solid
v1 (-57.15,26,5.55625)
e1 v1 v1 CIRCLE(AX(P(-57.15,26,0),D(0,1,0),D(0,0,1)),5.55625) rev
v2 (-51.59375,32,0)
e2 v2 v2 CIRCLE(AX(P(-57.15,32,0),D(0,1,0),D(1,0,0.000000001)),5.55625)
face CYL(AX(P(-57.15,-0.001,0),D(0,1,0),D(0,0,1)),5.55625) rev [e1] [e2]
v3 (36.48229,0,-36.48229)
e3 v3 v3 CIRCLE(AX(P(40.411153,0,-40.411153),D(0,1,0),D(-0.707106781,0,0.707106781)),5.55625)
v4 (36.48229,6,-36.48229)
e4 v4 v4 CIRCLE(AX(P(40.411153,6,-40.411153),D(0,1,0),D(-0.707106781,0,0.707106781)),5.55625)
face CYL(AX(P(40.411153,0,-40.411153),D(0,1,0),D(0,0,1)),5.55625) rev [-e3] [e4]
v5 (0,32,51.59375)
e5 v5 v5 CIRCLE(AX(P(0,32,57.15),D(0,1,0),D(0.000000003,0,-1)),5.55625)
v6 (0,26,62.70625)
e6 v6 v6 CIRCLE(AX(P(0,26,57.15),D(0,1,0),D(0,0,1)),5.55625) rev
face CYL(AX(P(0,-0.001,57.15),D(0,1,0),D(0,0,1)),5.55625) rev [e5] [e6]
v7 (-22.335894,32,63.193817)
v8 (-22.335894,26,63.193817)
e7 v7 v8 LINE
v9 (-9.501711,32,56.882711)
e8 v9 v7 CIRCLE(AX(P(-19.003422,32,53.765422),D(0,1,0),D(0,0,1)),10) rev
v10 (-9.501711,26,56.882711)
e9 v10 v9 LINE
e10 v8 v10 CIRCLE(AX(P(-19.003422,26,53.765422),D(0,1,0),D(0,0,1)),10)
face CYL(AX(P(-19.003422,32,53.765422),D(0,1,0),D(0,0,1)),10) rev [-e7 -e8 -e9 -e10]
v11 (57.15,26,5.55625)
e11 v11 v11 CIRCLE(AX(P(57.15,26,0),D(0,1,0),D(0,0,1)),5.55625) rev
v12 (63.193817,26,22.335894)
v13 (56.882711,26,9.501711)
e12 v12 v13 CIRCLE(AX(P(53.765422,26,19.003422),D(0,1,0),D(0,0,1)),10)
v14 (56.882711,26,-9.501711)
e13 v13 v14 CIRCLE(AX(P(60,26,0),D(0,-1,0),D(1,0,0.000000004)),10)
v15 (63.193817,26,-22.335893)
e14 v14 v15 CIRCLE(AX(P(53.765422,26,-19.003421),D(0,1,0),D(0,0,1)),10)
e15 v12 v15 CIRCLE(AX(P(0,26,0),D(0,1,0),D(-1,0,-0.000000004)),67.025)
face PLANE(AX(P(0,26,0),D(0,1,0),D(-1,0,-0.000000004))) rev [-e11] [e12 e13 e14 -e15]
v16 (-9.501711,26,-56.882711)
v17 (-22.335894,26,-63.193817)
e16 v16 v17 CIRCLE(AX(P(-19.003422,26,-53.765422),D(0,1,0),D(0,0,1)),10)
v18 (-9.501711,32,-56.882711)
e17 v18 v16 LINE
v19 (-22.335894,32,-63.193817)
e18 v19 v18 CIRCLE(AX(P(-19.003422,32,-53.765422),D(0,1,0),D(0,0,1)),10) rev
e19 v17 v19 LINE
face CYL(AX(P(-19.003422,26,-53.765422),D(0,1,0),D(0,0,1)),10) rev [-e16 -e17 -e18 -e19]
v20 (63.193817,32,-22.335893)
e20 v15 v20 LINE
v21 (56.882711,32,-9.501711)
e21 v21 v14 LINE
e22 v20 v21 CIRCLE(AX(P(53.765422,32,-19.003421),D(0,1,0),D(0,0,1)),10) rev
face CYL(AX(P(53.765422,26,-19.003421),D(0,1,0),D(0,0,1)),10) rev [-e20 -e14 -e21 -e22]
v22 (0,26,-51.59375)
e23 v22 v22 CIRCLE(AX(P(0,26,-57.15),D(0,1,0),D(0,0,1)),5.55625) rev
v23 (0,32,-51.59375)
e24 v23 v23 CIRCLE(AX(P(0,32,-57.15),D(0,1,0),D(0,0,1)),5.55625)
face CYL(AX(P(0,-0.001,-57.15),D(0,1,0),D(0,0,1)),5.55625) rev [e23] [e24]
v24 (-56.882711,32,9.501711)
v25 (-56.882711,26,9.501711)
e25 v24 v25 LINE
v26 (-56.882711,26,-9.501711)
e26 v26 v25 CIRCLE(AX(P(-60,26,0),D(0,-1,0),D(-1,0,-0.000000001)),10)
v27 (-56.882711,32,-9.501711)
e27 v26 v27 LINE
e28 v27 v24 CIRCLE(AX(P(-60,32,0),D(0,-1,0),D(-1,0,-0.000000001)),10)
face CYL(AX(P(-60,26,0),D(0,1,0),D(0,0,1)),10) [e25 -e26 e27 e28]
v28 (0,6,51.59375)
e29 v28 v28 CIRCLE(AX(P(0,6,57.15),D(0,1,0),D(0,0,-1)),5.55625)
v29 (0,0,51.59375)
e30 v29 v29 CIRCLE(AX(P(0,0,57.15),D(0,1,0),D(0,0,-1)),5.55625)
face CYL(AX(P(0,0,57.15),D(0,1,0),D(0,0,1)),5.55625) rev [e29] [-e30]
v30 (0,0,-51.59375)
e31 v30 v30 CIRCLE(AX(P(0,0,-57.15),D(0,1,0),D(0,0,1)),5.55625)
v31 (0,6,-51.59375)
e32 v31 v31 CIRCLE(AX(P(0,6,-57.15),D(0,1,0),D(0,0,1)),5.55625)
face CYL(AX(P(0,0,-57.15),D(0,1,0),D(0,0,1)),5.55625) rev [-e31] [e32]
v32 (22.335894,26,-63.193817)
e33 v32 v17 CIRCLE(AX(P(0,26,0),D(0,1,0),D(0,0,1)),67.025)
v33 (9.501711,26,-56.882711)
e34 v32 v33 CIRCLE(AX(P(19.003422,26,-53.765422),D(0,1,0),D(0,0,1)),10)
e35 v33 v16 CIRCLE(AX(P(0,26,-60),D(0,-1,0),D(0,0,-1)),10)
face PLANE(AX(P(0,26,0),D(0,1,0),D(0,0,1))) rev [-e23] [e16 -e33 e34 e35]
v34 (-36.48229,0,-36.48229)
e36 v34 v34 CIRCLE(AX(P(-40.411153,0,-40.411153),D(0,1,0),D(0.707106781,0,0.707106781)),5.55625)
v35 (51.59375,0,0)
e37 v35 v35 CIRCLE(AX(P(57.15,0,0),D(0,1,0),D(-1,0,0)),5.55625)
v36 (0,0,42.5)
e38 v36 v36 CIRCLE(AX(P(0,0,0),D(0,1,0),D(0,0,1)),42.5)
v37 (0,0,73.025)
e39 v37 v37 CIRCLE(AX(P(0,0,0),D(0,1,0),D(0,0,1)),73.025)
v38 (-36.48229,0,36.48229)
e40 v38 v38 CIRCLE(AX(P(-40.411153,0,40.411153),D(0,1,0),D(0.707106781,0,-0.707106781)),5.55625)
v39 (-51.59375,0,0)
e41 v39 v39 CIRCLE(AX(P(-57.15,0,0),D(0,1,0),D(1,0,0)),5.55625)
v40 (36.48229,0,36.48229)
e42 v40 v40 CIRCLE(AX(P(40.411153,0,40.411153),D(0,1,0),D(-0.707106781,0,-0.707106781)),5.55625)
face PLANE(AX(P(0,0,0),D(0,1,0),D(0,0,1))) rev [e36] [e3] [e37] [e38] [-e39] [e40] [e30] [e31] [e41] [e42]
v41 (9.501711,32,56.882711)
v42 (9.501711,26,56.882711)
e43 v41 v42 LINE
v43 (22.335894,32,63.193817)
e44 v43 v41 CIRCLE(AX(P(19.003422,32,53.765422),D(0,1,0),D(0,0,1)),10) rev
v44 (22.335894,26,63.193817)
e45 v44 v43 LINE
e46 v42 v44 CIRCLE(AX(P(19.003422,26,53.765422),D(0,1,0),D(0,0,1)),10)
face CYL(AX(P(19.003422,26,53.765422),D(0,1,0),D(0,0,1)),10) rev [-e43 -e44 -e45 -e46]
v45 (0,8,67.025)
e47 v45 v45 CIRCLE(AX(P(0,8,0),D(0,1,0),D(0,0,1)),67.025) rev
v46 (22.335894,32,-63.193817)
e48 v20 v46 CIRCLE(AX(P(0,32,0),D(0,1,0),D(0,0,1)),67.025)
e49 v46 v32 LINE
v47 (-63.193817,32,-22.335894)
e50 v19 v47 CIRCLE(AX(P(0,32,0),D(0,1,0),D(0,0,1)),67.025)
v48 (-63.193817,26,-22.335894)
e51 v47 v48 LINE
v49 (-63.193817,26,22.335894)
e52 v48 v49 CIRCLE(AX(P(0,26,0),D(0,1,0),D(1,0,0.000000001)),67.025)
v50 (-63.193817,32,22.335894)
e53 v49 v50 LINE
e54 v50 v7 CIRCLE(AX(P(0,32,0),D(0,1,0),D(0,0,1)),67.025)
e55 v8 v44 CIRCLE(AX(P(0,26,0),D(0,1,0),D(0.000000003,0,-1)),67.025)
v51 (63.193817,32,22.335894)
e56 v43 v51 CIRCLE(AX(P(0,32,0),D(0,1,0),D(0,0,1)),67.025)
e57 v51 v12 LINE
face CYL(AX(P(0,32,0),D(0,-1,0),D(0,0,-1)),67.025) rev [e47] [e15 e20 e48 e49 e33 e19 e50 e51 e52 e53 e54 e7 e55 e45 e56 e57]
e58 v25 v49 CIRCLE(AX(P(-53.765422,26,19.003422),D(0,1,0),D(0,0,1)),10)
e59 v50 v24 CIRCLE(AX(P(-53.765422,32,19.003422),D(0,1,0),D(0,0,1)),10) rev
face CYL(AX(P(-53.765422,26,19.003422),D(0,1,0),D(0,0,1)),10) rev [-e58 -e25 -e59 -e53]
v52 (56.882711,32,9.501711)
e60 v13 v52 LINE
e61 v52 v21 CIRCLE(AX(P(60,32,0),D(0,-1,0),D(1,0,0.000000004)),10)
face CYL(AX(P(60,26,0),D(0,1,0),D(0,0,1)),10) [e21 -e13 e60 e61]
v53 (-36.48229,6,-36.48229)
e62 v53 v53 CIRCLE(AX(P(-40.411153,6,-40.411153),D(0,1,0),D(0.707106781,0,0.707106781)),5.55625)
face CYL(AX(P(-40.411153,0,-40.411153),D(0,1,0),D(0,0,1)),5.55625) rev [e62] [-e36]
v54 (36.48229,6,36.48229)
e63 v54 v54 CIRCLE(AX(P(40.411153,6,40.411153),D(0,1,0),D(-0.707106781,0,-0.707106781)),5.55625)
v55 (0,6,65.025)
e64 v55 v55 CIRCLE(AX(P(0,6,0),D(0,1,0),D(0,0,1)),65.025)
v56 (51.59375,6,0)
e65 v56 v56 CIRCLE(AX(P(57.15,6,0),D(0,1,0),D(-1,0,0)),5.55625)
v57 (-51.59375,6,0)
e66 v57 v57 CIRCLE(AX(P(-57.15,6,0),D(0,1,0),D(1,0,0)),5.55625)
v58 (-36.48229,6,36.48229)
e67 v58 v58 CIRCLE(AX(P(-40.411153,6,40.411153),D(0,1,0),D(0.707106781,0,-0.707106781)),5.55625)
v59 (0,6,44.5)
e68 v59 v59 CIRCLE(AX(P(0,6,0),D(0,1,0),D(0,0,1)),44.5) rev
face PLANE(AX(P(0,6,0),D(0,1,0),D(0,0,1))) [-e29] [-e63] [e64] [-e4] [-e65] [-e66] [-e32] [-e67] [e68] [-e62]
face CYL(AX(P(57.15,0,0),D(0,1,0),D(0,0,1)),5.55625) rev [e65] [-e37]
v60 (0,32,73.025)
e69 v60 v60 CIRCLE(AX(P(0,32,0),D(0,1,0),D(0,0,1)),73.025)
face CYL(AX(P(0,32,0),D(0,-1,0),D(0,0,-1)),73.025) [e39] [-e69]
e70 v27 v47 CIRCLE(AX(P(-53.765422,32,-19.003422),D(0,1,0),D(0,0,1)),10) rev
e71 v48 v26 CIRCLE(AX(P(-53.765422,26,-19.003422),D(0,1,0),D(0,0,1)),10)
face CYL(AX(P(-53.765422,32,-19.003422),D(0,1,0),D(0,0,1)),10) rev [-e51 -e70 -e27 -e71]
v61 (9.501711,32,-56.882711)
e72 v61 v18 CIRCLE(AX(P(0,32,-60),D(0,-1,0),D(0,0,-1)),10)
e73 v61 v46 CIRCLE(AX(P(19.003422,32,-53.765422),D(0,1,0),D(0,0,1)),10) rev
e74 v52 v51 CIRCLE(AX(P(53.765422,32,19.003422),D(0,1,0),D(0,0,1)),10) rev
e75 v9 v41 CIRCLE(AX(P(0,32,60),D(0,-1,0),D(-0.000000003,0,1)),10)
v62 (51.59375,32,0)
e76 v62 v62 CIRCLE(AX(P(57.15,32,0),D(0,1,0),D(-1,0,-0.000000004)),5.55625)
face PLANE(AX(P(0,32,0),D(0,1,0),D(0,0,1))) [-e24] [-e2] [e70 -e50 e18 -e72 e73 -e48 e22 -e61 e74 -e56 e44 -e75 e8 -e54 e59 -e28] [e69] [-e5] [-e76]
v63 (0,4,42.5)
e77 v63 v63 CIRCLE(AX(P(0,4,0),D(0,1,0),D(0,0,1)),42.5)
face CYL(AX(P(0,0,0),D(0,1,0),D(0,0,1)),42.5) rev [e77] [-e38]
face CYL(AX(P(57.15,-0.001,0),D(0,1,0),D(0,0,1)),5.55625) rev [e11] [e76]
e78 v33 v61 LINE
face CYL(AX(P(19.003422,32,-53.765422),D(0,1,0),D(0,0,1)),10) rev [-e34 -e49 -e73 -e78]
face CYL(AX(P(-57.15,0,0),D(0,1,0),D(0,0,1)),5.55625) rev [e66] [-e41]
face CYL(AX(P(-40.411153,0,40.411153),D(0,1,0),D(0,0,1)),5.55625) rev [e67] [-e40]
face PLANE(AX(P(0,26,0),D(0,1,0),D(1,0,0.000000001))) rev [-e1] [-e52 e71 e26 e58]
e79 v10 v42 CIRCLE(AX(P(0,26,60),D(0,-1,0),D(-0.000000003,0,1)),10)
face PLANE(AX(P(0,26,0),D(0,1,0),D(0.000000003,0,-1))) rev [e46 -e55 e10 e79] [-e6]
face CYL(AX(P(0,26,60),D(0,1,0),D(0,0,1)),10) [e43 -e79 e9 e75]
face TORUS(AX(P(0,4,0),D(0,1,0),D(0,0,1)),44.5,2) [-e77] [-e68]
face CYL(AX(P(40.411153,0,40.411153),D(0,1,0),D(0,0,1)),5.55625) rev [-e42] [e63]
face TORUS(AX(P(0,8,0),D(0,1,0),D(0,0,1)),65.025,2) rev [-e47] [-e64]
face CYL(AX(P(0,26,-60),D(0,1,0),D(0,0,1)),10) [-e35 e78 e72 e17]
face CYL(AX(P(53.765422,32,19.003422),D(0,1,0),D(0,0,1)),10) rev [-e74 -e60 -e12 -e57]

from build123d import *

# Parameters (mm, degrees)
SKETCH1_R             = 73.02499999999999
BASE_EXTRUDE_DEPTH    = 32
SHELL1_T              = -6
SKETCH4_R             = 42.5
CUT_EXTRUDE2_DEPTH    = 107.49554568149786
BOSS_EXTRUDE1_START   = -6
BOSS_EXTRUDE1_DEPTH   = 6
CUT_EXTRUDE1_REACH    = 110.117
SKETCH3_R             = 5.556250000000003
FILLET1_R             = 10
CIRPATTERN1_START     = 26
CIRPATTERN1_OUTLINE_R = 5.55625
CIRPATTERN1_DEPTH     = 6
SKETCH5_R             = 5.5562499999999995
CUT_EXTRUDE3_DEPTH    = 107.49554568149786
CIRPATTERN2_COUNT     = 8
FILLET2_R             = 2


# Read off the part's stored shape, not the designer's step: CirPattern1
with BuildPart() as part:
    # Sketch1 → Base-Extrude (new body)
    with BuildSketch(Plane(origin=(0, 0, 0), x_dir=(1, 0, 0), z_dir=(0, 1, 0))):
        with Locations(Location((0, 0, 0), (0, 0, 270))):
            Circle(SKETCH1_R)
    extrude(amount=BASE_EXTRUDE_DEPTH)

    # Shell1
    shell1_openings = [part.faces().sort_by_distance(p)[0] for p in [
        (0, 32, 0),
    ]]
    offset(amount=SHELL1_T, openings=shell1_openings, kind=Kind.INTERSECTION)

    # Sketch4 → Cut-Extrude2 (cut, through all)
    with BuildSketch(Plane(origin=(0, 6, 0), x_dir=(-1, 0, 0), z_dir=(0, 1, 0))):
        with Locations(Location((0, 0, 0), (0, 0, 90))):
            Circle(SKETCH4_R)
    extrude(amount=-CUT_EXTRUDE2_DEPTH, mode=Mode.SUBTRACT)

    # Sketch2 → Boss-Extrude1 (add)
    with BuildSketch(Plane(origin=(0, 32, 0), x_dir=(-1, 0, 0), z_dir=(0, 1, 0)).offset(BOSS_EXTRUDE1_START)):
        with BuildLine():
            Line((-10, -66.2748113916592), (-10.000000000000002, -60))
            ThreePointArc((-10.000000000000002, -60), (6.1e-16, -50), (10.000000000000002, -60))
            Line((10.000000000000002, -60), (10, -66.2748113916592))
            ThreePointArc((10, -66.2748113916592), (4.1e-15, -67.025), (-10, -66.2748113916592))
        make_face()
    extrude(amount=BOSS_EXTRUDE1_DEPTH)

    # Sketch3 → Cut-Extrude1 (cut, up to next)
    with BuildSketch(Plane(origin=(0, 32, 0), x_dir=(-1, 0, 0), z_dir=(0, 1, 0)), mode=Mode.PRIVATE) as cut_extrude1_sk1:
        with Locations(Location((0, -57.15, 0), (0, 0, 90))):
            Circle(SKETCH3_R)
    cut_extrude1_tool1 = extrude(cut_extrude1_sk1.sketch, amount=-CUT_EXTRUDE1_REACH, mode=Mode.PRIVATE) & part.part
    add(cut_extrude1_tool1.solids().sort_by_distance((0, 32, -57.15))[0], mode=Mode.SUBTRACT)

    # Fillet1
    # the kernel refuses this fillet: 10 mm, written as the material it adds along each edge
    with BuildSketch(Plane(origin=(-10, 26, -66.2748113916592), x_dir=(-0.9701975992625391, 0, 0.24231512207290193), z_dir=(0, 1, 0))) as fillet1_piece_1:
        with BuildLine():
            CenterArc((11.76631234828467, 9.95491445348666), FILLET1_R, 184.14023221581692, 91.30253304935542)
            Line((1.7924090220068125, 9.232936311114328), (0.7950186893790265, 9.160738496877093))
            ThreePointArc((0.7950186893790265, 9.160738496877093), (0.5502840890917953, 6.3301220700858885), (-0.9701975992625391, 0.24231512207290193))
            Line((-0.9701975992625391, 0.24231512207290193), (-0.09485136919214045, -0.9954914453486712))
            ThreePointArc((-0.09485136919214045, -0.9954914453486712), (6.357413020103008, -1.3021858755056244), (12.809677409398176, -0.9954914453486696))
            Line((12.809677409398176, -0.9954914453486696), (12.714826040206038, 1.7e-16))
        make_face()
    extrude(amount=6)
    with BuildSketch(Plane(origin=(10, 26, -66.2748113916592), x_dir=(0.970197599262539, 0, 0.24231512207290234), z_dir=(0, 1, 0))) as fillet1_piece_2:
        with BuildLine():
            CenterArc((11.766312348284657, -9.95491445348666), FILLET1_R, 84.55723473482769, 91.30253304935547)
            Line((1.792409022006801, -9.232936311114338), (0.7950186893790149, -9.160738496877103))
            ThreePointArc((0.7950186893790149, -9.160738496877103), (0.550284089091798, -6.3301220700858885), (-0.970197599262539, -0.24231512207290234))
            Line((-0.970197599262539, -0.24231512207290234), (-0.09485136919213914, 0.9954914453486715))
            ThreePointArc((-0.09485136919213914, 0.9954914453486715), (6.357413020103015, 1.3021858755056288), (12.809677409398152, 0.995491445348669))
            Line((12.809677409398152, 0.995491445348669), (12.714826040206018, 1.7e-16))
        make_face()
    extrude(amount=6)
    # the kernel refuses this fillet: 10 mm, written as the material it takes off along each edge

    # CirPattern1 outline → CirPattern1 (add)
    # profile 1 of 3: a face of its own
    with BuildSketch(Plane(origin=(0, 0, 0), x_dir=(1, 0, 0), z_dir=(0, 1, 0)).offset(CIRPATTERN1_START)):
        with BuildLine():
            ThreePointArc((-63.193816801, -22.335893605), (-62.73913957, -14.590668353), (-56.882710952, -9.501710756))
            ThreePointArc((-56.882710952, -9.501710756), (-50, 7.4e-08), (-56.882710923, 9.501710926))
            ThreePointArc((-56.882710923, 9.501710926), (-62.739139527, 14.59066854), (-63.193816734, 22.335893794))
            ThreePointArc((-63.193816734, 22.335893794), (-67.025, 1e-07), (-63.193816801, -22.335893605))
        make_face()
        with Locations((-57.15, 8.5e-08)):
            Circle(CIRPATTERN1_OUTLINE_R, mode=Mode.SUBTRACT)
    # profile 2 of 3: a face of its own
    with BuildSketch(Plane(origin=(0, 0, 0), x_dir=(1, 0, 0), z_dir=(0, 1, 0)).offset(CIRPATTERN1_START)):
        with BuildLine():
            ThreePointArc((-9.501711011, -56.882710909), (-14.590668634, -62.739139505), (-22.335893888, -63.193816701))
            ThreePointArc((-22.335893888, -63.193816701), (-2e-07, -67.025), (22.33589351, -63.193816834))
            ThreePointArc((22.33589351, -63.193816834), (14.590668259, -62.739139592), (9.501710671, -56.882710966))
            ThreePointArc((9.501710671, -56.882710966), (-1.49e-07, -50), (-9.501711011, -56.882710909))
        make_face()
        with Locations((-1.71e-07, -57.15)):
            Circle(CIRPATTERN1_OUTLINE_R, mode=Mode.SUBTRACT)
    # profile 3 of 3: a face of its own
    with BuildSketch(Plane(origin=(0, 0, 0), x_dir=(1, 0, 0), z_dir=(0, 1, 0)).offset(CIRPATTERN1_START)):
        with BuildLine():
            ThreePointArc((63.193816667, -22.335893983), (67.025, -3.01e-07), (63.193816868, 22.335893416))
            ThreePointArc((63.193816868, 22.335893416), (62.739139614, 14.590668165), (56.88271098, 9.501710585))
            ThreePointArc((56.88271098, 9.501710585), (50, -2.25e-07), (56.882710895, -9.501711096))
            ThreePointArc((56.882710895, -9.501711096), (62.739139483, -14.590668728), (63.193816667, -22.335893983))
        make_face()
        with Locations((57.15, -2.56e-07)):
            Circle(CIRPATTERN1_OUTLINE_R, mode=Mode.SUBTRACT)
    extrude(amount=CIRPATTERN1_DEPTH)

    # Sketch5 → Cut-Extrude3 (cut, through all)
    with BuildSketch(Plane(origin=(0, 6, 0), x_dir=(-1, 0, 0), z_dir=(0, 1, 0))):
        with Locations(Location((0, -57.15, 0), (0, 0, 90))):
            Circle(SKETCH5_R)
    cut_extrude3 = extrude(amount=-CUT_EXTRUDE3_DEPTH, mode=Mode.SUBTRACT)

    # CirPattern2: Cut-Extrude3 ×8 about axis
    cirpattern2_axis = Axis((3.1e-16, 0, -1.3e-16), (0, 1, 0))
    for i in range(1, CIRPATTERN2_COUNT):
        add(cut_extrude3.rotate(cirpattern2_axis, i * 360 / CIRPATTERN2_COUNT), mode=Mode.SUBTRACT)

    # Fillet2
    fillet2_edges = [part.edges().sort_by_distance(p)[0] for p in [
        (7.81e-15, 6, -42.5),
        (4.1e-15, 6, -67.02499999999999),
    ]]
    fillet(fillet2_edges, radius=FILLET2_R)


solid = part.part
